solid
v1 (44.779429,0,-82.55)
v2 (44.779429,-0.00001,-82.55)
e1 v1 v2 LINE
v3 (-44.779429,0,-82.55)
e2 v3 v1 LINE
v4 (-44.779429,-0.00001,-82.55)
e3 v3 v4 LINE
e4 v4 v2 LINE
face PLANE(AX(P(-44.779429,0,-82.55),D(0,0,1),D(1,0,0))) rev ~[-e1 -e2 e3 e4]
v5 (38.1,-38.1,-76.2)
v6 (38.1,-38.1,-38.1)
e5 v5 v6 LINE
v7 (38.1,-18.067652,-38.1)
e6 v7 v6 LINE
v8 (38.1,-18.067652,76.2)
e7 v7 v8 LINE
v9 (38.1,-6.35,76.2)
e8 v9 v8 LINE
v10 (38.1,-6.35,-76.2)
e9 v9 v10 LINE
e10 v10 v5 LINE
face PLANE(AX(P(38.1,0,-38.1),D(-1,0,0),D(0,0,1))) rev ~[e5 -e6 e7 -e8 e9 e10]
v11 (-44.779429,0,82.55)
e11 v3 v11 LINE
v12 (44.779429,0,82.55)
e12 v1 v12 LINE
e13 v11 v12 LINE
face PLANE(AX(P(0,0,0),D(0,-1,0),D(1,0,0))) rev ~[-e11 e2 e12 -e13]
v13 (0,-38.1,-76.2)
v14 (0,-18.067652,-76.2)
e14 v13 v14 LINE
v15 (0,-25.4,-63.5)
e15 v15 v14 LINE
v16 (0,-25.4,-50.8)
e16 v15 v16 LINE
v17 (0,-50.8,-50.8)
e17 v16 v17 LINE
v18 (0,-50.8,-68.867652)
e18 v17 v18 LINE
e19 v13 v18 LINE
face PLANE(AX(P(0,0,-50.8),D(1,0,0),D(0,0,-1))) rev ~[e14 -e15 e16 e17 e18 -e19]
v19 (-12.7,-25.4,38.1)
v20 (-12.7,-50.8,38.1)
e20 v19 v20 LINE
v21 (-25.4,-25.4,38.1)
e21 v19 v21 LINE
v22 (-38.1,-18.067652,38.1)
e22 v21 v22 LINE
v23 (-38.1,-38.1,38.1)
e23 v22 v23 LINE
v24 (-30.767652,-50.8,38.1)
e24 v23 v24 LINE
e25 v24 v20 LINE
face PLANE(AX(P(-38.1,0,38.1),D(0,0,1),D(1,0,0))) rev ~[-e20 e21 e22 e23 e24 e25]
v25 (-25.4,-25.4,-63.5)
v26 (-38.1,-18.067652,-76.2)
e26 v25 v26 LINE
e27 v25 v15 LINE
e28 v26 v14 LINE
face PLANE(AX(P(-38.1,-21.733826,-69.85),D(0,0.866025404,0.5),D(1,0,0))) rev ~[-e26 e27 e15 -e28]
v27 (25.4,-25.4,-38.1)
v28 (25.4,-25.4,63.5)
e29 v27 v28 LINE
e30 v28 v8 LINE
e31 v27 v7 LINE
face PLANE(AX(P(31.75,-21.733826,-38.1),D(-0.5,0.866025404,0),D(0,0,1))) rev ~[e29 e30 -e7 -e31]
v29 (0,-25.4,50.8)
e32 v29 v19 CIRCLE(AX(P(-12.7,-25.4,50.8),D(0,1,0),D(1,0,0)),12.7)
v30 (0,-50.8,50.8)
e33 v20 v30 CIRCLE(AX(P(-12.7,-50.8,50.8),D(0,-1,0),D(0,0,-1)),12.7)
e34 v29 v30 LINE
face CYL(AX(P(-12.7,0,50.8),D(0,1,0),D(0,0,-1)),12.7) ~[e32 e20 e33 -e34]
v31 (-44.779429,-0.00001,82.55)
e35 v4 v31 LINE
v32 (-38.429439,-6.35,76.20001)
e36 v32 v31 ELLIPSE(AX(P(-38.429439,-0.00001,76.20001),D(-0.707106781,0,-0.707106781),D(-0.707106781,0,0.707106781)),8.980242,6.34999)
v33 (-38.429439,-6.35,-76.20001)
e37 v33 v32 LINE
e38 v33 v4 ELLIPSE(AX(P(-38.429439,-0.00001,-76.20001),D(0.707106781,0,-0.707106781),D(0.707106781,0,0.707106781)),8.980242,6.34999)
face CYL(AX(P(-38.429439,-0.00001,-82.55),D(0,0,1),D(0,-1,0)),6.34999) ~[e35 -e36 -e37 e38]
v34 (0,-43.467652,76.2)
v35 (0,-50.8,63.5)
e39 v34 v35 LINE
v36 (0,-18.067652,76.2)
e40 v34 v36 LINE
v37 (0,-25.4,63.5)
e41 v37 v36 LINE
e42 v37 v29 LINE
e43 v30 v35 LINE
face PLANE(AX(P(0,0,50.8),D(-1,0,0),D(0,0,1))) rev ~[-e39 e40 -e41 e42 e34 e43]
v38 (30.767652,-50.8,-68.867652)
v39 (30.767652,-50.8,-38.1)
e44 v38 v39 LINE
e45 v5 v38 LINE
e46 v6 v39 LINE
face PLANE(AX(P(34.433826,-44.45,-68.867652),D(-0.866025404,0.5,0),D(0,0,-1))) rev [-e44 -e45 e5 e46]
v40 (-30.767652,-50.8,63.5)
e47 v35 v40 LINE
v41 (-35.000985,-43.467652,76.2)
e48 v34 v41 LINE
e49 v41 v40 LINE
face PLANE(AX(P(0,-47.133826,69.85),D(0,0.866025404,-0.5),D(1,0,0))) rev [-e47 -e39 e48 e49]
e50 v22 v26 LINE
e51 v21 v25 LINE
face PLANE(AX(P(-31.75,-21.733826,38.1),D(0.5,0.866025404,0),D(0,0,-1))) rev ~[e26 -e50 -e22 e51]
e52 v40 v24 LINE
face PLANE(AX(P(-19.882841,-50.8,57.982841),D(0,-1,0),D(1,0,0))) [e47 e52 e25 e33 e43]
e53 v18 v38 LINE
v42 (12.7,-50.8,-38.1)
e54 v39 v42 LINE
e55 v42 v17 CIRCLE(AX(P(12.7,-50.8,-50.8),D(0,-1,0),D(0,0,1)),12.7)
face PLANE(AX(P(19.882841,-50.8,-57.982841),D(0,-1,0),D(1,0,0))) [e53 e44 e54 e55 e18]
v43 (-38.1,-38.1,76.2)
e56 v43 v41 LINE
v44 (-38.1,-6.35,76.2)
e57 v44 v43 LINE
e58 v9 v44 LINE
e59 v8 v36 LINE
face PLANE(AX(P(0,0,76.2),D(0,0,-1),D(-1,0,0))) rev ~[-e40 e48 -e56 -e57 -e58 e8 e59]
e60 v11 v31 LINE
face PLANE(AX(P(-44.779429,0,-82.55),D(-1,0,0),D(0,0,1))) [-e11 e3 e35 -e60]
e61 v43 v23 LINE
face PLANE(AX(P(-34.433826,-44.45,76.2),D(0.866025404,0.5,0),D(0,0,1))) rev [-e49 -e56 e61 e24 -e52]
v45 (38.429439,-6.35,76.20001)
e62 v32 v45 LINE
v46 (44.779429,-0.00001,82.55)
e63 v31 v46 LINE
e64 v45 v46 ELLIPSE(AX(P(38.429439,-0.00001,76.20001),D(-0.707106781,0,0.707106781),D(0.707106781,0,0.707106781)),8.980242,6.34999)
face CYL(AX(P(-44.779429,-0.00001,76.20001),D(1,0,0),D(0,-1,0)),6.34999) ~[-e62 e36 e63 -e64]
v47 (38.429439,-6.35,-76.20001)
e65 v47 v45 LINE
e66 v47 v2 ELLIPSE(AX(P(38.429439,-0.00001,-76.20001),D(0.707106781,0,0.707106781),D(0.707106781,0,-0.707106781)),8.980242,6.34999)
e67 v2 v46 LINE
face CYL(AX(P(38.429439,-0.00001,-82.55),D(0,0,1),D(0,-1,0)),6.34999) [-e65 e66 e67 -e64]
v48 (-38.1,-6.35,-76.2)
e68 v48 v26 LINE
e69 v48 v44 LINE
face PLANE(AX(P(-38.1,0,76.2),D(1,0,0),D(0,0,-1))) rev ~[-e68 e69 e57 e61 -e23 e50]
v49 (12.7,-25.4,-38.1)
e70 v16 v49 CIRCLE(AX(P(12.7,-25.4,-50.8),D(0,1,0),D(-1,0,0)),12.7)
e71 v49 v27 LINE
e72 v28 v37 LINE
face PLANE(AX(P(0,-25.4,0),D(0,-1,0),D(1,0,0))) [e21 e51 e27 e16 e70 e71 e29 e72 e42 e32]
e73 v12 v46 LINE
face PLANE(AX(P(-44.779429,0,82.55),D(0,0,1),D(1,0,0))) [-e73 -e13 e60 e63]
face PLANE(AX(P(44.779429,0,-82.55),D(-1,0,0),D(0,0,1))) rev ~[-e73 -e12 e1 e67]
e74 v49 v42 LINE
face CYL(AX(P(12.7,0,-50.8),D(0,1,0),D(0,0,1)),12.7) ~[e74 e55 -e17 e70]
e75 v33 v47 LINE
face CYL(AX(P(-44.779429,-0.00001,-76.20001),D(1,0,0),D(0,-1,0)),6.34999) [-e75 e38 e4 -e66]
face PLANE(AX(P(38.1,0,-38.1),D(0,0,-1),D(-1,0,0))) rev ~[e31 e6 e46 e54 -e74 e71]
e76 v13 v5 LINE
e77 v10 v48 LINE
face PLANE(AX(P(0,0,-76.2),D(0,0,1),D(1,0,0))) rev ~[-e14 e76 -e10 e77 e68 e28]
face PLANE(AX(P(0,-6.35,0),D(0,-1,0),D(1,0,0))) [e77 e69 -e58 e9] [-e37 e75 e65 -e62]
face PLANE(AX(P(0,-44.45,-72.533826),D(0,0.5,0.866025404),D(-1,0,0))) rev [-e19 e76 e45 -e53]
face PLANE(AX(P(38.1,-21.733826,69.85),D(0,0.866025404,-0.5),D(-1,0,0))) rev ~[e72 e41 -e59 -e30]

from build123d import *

# Parameters (mm, degrees)
F0_W        = 89.5588581535
F0_H        = 165.1
F1_DEPTH    = 6.35
F2_DEPTH    = 25.4
F3_DEPTH    = 50.8
F4_R        = 6.34999
F5_SIZE2    = 7.3323484187
F5_SIZE     = 12.7
F6_C1_SIZE2 = 7.3323484187
F6_C1_SIZE  = 12.7
F6_C2_SIZE2 = 7.3323484187
F6_C2_SIZE  = 12.7
F6_C3_SIZE2 = 12.7
F6_C3_SIZE  = 7.3323484187
F6_C4_SIZE2 = 7.3323484187
F6_C4_SIZE  = 12.7


# Not quite as in the source:
# - a fillet or chamfer is up to 0.001 mm smaller than in the source, because OpenCascade refuses the exact size


with BuildPart() as f1:
    # F0 (on Front) → F1 (new body)
    with BuildSketch(Plane.XZ):
        Rectangle(F0_W, F0_H)
        Polygon((-38.1, 38.1), (-38.1, 76.2), (0, 76.2), (38.1, 76.2), (38.1, -38.1), (38.1, -76.2), (0, -76.2), (-38.1, -76.2), align=None, mode=Mode.SUBTRACT)
    extrude(amount=F1_DEPTH)

    # F0 (on Front) → F2 (join)
    with BuildSketch(Plane.XZ):
        with BuildLine():
            Line((38.1, 76.2), (0, 76.2))
            Line((0, 76.2), (0, 50.8))
            ThreePointArc((0, 50.8), (-3.7197438789, 41.8197438789), (-12.7, 38.1))
            Line((-12.7, 38.1), (-38.1, 38.1))
            Line((-38.1, 38.1), (-38.1, -76.2))
            Line((-38.1, -76.2), (0, -76.2))
            Line((0, -76.2), (0, -50.8))
            ThreePointArc((0, -50.8), (3.7197438789, -41.8197438789), (12.7, -38.1))
            Line((12.7, -38.1), (38.1, -38.1))
            Line((38.1, -38.1), (38.1, 76.2))
        make_face()
    extrude(amount=F2_DEPTH)

    # F0 (on Front) → F3 (join)
    with BuildSketch(Plane.XZ):
        with BuildLine():
            Line((0, 76.2), (-38.1, 76.2))
            Line((-38.1, 76.2), (-38.1, 38.1))
            Line((-38.1, 38.1), (-12.7, 38.1))
            ThreePointArc((-12.7, 38.1), (-3.7197438789, 41.8197438789), (0, 50.8))
            Line((0, 50.8), (0, 76.2))
        make_face()
        with BuildLine():
            Line((38.1, -76.2), (38.1, -38.1))
            Line((38.1, -38.1), (12.7, -38.1))
            ThreePointArc((12.7, -38.1), (3.7197438789, -41.8197438789), (0, -50.8))
            Line((0, -50.8), (0, -76.2))
            Line((0, -76.2), (38.1, -76.2))
        make_face()
    extrude(amount=F3_DEPTH)

    # F4 (radius 6.35 in the source; OpenCascade refuses exactly that, so slightly less here)
    f4_edges = [f1.edges().sort_by_distance(p)[0] for p in [
        (-44.779429, -6.35, 0),
        (0, -6.35, 82.55),
        (0, -6.35, -82.55),
        (44.779429, -6.35, 0),
    ]]
    fillet(f4_edges, radius=F4_R)

    # F5
    f5_edges = [f1.edges().sort_by_distance(p)[0] for p in [
        (-19.05, -25.4, -76.2),
        (38.1, -25.4, 19.05),
        (-38.1, -25.4, -19.05),
        (19.05, -25.4, 76.2),
    ]]
    f5_side = f1.faces().sort_by_distance((0, -25.4, 0))[0]
    chamfer(f5_edges, length=F5_SIZE, length2=F5_SIZE2, reference=f5_side)

    # F6: chamfer of 12.7 x 7.3323484187 on 4 edges, made by hand

    # F6_c1
    f6_c1_edges = [f1.edges().sort_by_distance(p)[0] for p in [
        (-38.1, -50.8, 57.15),
    ]]
    f6_c1_side = f1.faces().sort_by_distance((-38.1, -50.6533530316, 57.15))[0]
    chamfer(f6_c1_edges, length=F6_C1_SIZE, length2=F6_C1_SIZE2, reference=f6_c1_side)

    # F6_c2
    f6_c2_edges = [f1.edges().sort_by_distance(p)[0] for p in [
        (19.05, -50.8, -76.2),
    ]]
    f6_c2_side = f1.faces().sort_by_distance((19.05, -50.6533530316, -76.2))[0]
    chamfer(f6_c2_edges, length=F6_C2_SIZE, length2=F6_C2_SIZE2, reference=f6_c2_side)

    # F6_c3
    f6_c3_edges = [f1.edges().sort_by_distance(p)[0] for p in [
        (-15.3838257906, -50.8, 76.2),
    ]]
    f6_c3_side = f1.faces().sort_by_distance((-15.3838257906, -50.6533530316, 76.2))[0]
    chamfer(f6_c3_edges, length=F6_C3_SIZE, length2=F6_C3_SIZE2, reference=f6_c3_side)

    # F6_c4
    f6_c4_edges = [f1.edges().sort_by_distance(p)[0] for p in [
        (38.1, -50.8, -53.4838257906),
    ]]
    f6_c4_side = f1.faces().sort_by_distance((38.1, -50.6533530316, -53.4838257906))[0]
    chamfer(f6_c4_edges, length=F6_C4_SIZE, length2=F6_C4_SIZE2, reference=f6_c4_side)


solid = f1.part
